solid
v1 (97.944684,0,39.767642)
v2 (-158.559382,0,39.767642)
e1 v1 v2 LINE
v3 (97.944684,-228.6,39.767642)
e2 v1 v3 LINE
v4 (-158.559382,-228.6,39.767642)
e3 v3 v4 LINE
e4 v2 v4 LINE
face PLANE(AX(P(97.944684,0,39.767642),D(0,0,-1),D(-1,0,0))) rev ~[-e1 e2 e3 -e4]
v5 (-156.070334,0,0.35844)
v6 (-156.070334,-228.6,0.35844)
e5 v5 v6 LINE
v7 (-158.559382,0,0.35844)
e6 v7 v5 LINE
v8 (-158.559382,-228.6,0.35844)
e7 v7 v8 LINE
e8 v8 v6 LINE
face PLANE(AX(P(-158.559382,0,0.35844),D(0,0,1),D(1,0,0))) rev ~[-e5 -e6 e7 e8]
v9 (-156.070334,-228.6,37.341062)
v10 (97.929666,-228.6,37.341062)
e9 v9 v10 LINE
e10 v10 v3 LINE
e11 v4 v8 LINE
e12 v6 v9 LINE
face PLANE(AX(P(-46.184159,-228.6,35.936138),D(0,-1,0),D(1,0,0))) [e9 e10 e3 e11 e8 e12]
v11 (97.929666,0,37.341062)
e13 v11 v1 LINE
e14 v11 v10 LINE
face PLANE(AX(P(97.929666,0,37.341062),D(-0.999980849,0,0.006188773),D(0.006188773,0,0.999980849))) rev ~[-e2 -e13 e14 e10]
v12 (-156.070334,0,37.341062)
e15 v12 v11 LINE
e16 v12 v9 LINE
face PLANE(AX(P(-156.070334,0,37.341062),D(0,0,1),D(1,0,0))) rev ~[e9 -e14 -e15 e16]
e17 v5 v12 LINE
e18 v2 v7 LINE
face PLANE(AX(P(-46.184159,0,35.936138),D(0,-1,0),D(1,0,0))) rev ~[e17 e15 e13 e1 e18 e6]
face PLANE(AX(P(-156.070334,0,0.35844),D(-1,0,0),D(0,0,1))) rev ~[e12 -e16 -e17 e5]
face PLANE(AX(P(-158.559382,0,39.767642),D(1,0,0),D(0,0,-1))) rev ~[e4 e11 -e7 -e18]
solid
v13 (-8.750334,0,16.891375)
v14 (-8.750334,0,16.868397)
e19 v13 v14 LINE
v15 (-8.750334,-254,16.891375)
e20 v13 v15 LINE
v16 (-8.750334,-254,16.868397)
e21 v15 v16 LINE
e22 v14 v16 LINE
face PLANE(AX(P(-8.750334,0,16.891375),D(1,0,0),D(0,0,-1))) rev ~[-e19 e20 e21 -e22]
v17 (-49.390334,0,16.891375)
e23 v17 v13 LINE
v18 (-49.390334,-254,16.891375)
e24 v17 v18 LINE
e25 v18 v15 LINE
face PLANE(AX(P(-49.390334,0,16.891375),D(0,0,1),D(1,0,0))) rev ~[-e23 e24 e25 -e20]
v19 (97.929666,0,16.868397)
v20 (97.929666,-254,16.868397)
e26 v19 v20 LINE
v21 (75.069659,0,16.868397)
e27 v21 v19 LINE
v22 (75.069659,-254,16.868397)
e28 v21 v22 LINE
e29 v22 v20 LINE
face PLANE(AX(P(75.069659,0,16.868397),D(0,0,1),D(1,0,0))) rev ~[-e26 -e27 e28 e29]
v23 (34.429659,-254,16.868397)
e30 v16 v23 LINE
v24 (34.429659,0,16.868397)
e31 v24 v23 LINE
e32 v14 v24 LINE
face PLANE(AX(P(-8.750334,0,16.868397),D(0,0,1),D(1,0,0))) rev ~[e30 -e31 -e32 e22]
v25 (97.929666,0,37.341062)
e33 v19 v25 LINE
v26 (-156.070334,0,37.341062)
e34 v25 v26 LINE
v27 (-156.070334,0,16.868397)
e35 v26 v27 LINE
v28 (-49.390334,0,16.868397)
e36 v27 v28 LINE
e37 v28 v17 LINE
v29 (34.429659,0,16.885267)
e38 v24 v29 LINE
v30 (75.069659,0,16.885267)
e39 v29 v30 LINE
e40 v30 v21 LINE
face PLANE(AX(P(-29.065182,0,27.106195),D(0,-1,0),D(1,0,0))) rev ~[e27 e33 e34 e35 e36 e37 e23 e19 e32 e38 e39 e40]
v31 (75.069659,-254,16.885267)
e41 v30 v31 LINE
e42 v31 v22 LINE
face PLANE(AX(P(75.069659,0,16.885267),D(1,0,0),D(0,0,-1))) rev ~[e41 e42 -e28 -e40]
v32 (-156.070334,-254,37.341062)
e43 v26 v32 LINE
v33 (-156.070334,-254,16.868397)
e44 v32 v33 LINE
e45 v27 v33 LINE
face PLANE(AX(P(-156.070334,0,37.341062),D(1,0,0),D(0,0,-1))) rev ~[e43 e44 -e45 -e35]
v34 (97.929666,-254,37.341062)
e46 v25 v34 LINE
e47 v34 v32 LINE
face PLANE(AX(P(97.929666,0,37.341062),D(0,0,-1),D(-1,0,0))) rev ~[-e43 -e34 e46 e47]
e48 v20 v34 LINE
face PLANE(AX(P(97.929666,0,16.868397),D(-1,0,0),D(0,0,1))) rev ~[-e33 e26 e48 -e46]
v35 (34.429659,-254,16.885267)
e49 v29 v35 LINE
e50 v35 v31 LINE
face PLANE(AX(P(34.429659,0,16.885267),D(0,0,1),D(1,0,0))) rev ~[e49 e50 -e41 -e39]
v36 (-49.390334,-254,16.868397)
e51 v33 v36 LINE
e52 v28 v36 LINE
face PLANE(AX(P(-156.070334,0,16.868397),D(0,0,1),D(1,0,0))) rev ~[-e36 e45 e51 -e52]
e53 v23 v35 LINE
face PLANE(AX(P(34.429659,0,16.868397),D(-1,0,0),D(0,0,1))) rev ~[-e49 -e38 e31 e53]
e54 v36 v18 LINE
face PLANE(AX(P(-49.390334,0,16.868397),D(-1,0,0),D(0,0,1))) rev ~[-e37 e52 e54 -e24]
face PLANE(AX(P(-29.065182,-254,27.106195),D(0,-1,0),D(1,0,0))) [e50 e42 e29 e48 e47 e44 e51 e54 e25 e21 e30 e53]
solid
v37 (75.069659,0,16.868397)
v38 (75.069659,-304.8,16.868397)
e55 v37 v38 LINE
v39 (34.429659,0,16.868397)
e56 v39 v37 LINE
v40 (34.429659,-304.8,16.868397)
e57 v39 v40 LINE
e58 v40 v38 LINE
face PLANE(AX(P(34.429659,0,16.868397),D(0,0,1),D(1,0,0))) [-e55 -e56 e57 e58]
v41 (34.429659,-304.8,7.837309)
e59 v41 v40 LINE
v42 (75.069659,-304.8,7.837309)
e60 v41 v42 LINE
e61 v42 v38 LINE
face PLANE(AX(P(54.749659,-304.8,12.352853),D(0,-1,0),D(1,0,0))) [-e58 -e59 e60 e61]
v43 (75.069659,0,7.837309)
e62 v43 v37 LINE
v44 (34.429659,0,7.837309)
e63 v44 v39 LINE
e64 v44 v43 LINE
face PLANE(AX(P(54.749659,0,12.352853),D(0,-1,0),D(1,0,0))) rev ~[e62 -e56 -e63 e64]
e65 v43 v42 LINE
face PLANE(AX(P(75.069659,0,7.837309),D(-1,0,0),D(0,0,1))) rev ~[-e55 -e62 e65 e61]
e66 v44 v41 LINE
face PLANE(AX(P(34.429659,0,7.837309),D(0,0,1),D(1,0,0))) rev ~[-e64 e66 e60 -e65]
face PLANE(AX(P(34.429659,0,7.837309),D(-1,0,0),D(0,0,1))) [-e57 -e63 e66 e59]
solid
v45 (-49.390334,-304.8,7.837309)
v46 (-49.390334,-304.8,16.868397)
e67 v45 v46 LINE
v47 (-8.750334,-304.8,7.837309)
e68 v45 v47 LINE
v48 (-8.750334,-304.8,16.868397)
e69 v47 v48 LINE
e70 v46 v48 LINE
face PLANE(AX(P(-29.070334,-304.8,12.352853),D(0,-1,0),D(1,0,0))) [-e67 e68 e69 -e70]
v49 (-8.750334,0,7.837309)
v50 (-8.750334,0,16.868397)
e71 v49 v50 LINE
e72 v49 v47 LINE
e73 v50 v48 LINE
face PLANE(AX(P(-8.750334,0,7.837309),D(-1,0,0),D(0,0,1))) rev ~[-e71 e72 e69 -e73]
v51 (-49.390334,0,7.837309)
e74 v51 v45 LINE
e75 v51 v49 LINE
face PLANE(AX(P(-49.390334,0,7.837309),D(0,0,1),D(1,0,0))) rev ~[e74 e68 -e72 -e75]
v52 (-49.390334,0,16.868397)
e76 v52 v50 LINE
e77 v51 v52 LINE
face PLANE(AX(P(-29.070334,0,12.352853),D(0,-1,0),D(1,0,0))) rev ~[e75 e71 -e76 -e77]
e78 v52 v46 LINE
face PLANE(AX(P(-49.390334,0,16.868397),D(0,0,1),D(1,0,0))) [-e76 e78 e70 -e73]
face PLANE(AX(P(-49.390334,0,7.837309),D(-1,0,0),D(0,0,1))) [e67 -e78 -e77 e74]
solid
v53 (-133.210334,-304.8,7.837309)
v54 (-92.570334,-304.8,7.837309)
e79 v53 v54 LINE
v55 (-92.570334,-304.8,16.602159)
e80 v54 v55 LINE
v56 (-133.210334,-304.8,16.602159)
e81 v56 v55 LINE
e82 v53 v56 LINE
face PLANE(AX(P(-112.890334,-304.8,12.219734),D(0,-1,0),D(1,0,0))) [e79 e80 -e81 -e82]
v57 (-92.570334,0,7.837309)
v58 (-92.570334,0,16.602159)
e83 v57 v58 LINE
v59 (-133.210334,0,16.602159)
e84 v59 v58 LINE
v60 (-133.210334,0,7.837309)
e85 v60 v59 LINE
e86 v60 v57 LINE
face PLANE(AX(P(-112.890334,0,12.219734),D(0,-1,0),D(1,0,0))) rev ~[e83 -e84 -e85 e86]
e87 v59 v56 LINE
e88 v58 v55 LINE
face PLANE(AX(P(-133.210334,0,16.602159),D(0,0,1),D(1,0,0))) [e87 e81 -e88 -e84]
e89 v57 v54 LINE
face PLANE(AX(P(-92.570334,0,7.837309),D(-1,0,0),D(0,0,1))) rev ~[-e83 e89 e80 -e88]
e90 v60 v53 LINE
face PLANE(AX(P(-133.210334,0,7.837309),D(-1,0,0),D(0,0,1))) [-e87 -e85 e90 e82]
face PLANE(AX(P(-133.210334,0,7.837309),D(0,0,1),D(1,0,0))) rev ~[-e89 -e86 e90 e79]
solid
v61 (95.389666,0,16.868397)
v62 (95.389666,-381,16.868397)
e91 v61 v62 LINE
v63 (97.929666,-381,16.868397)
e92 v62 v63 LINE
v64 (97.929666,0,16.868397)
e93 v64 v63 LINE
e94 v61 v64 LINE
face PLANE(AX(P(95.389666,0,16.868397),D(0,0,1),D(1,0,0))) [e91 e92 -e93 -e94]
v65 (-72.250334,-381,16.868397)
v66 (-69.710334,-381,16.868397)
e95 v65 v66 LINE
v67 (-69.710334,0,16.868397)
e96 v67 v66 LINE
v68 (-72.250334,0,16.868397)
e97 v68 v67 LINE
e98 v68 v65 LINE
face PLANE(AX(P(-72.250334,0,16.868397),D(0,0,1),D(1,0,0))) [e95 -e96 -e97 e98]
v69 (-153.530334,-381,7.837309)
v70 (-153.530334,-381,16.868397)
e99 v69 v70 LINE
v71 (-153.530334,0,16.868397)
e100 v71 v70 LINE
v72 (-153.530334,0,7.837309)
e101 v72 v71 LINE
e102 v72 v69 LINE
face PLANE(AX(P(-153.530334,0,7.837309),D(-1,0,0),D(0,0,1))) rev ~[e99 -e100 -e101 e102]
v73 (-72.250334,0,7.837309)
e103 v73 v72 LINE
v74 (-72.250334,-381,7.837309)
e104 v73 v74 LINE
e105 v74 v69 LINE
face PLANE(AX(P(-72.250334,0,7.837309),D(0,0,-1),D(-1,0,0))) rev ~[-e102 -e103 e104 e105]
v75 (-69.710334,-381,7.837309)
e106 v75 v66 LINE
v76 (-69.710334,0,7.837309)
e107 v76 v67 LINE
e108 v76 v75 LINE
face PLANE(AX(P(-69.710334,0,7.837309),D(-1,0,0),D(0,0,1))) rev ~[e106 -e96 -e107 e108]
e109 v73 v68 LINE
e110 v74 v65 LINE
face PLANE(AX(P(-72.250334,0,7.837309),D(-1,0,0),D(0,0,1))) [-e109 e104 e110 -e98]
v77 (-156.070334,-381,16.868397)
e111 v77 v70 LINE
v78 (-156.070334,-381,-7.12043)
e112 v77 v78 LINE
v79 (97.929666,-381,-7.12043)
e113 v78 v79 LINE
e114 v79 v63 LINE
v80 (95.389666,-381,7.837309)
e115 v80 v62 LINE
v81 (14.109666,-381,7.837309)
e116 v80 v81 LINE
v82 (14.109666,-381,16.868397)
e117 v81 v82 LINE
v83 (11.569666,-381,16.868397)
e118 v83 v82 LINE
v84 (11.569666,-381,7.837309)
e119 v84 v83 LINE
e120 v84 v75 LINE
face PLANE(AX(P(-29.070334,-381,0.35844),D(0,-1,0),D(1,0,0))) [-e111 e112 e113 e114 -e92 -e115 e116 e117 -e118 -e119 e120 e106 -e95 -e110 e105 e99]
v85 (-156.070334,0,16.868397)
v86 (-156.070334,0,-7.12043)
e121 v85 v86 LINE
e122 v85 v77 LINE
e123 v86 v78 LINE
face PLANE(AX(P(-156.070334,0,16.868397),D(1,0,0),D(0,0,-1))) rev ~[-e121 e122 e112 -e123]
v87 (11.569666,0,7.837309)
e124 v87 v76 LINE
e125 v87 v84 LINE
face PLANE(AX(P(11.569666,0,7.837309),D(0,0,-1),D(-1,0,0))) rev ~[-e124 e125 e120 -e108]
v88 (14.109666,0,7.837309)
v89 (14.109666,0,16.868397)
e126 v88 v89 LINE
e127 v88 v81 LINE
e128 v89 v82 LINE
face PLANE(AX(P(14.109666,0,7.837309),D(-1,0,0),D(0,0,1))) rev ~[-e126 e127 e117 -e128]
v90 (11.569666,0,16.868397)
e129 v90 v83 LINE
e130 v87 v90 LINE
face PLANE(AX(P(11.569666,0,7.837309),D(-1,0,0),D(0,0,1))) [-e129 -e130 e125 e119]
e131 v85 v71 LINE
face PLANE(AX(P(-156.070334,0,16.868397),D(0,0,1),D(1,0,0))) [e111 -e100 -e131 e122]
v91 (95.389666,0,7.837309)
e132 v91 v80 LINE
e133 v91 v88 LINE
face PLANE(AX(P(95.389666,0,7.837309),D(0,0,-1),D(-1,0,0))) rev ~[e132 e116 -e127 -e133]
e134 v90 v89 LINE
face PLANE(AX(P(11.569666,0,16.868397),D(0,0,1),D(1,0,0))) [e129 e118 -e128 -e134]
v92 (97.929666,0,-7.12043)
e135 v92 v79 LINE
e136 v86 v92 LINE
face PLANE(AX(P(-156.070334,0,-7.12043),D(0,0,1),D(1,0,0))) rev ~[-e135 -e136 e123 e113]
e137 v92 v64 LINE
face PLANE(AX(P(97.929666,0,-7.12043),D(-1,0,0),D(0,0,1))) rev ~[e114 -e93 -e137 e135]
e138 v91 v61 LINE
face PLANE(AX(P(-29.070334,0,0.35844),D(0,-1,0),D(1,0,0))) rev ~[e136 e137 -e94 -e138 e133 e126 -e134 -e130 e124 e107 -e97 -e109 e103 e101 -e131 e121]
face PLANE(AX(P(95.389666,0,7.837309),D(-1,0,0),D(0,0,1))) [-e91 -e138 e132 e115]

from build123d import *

# Parameters (mm, degrees)
F0_W     = 2.54
F0_H     = 9.0310877802
F1_DEPTH = 381
F0_W_2   = 40.64
F0_H_2   = 8.7648493582
F2_DEPTH = 304.8
F3_DEPTH = 254
F4_DEPTH = 228.6


with BuildPart() as f1:
    # F0 (on Front) → F1 (new body)
    with BuildSketch(Plane.XZ):
        Polygon((-153.5303335104, 7.8373091883), (-156.0703335104, 7.8373091883), (-156.0703335104, 0.3584396719), (-156.0703335104, -7.1204298445), (97.9296664896, -7.1204298445), (97.9296664896, 7.8373091883), (95.3896664896, 7.8373091883), (75.0696594866, 7.8373091883), (34.4296594866, 7.8373091883), (14.1096664896, 7.8373091883), (11.5696664896, 7.8373091883), (-8.7503335104, 7.8373091883), (-49.3903335104, 7.8373091883), (-69.7103335104, 7.8373091883), (-72.2503335104, 7.8373091883), (-92.5703335104, 7.8373091883), (-133.2103335104, 7.8373091883), align=None)
        with Locations((-154.8003335104, 12.3528530784)):
            Rectangle(F0_W, F0_H)
        with Locations((-70.9803335104, 12.3528530784)):
            Rectangle(F0_W, F0_H)
        with Locations((12.8396664896, 12.3528530784)):
            Rectangle(F0_W, F0_H)
        with Locations((96.6596664896, 12.3528530784)):
            Rectangle(F0_W, F0_H)
    extrude(amount=F1_DEPTH)


with BuildPart() as f2:
    # F0 (on Front) → F2 (new body)
    with BuildSketch(Plane.XZ):
        with Locations((-112.8903335104, 12.2197338674)):
            Rectangle(F0_W_2, F0_H_2)
    extrude(amount=F2_DEPTH)


with BuildPart() as f2b:
    # F0 (on Front) → F2, piece 2 (new body)
    with BuildSketch(Plane.XZ):
        with Locations((-29.0703335104, 12.3528530784)):
            Rectangle(F0_W_2, F0_H)
    extrude(amount=F2_DEPTH)


with BuildPart() as f2c:
    # F0 (on Front) → F2, piece 3 (new body)
    with BuildSketch(Plane.XZ):
        with Locations((54.7496594866, 12.3528530784)):
            Rectangle(F0_W_2, F0_H)
    extrude(amount=F2_DEPTH)


with BuildPart() as f3:
    # F0 (on Front) → F3 (new body)
    with BuildSketch(Plane.XZ):
        Polygon((-156.0703335104, 37.3410619795), (-156.0703335104, 16.8683969685), (-153.5303335104, 16.8683969685), (-72.2503335104, 16.8683969685), (-69.7103335104, 16.8683969685), (-49.3903335104, 16.8683969685), (-49.3903335104, 16.8913751841), (-8.7503335104, 16.8913751841), (-8.7503335104, 16.8683969685), (11.5696664896, 16.8683969685), (14.1096664896, 16.8683969685), (34.4296594866, 16.8683969685), (34.4296594866, 16.8852672009), (75.0696594866, 16.8852672009), (75.0696594866, 16.8683969685), (95.3896664896, 16.8683969685), (97.9296664896, 16.8683969685), (97.9296664896, 37.3410619795), align=None)
    extrude(amount=F3_DEPTH)


with BuildPart() as f4:
    # F0 (on Front) → F4 (new body)
    with BuildSketch(Plane.XZ):
        Polygon((-156.0703335104, 0.3584396719), (-156.0703335104, 7.8373091883), (-156.0703335104, 16.8683969685), (-156.0703335104, 37.3410619795), (97.9296664896, 37.3410619795), (97.9446843266, 39.7676415741), (-158.5593819618, 39.7676415741), (-158.5593819618, 0.3584396719), align=None)
    extrude(amount=F4_DEPTH)


solid = Compound([f1.part, f2.part, f2b.part, f2c.part, f3.part, f4.part])
